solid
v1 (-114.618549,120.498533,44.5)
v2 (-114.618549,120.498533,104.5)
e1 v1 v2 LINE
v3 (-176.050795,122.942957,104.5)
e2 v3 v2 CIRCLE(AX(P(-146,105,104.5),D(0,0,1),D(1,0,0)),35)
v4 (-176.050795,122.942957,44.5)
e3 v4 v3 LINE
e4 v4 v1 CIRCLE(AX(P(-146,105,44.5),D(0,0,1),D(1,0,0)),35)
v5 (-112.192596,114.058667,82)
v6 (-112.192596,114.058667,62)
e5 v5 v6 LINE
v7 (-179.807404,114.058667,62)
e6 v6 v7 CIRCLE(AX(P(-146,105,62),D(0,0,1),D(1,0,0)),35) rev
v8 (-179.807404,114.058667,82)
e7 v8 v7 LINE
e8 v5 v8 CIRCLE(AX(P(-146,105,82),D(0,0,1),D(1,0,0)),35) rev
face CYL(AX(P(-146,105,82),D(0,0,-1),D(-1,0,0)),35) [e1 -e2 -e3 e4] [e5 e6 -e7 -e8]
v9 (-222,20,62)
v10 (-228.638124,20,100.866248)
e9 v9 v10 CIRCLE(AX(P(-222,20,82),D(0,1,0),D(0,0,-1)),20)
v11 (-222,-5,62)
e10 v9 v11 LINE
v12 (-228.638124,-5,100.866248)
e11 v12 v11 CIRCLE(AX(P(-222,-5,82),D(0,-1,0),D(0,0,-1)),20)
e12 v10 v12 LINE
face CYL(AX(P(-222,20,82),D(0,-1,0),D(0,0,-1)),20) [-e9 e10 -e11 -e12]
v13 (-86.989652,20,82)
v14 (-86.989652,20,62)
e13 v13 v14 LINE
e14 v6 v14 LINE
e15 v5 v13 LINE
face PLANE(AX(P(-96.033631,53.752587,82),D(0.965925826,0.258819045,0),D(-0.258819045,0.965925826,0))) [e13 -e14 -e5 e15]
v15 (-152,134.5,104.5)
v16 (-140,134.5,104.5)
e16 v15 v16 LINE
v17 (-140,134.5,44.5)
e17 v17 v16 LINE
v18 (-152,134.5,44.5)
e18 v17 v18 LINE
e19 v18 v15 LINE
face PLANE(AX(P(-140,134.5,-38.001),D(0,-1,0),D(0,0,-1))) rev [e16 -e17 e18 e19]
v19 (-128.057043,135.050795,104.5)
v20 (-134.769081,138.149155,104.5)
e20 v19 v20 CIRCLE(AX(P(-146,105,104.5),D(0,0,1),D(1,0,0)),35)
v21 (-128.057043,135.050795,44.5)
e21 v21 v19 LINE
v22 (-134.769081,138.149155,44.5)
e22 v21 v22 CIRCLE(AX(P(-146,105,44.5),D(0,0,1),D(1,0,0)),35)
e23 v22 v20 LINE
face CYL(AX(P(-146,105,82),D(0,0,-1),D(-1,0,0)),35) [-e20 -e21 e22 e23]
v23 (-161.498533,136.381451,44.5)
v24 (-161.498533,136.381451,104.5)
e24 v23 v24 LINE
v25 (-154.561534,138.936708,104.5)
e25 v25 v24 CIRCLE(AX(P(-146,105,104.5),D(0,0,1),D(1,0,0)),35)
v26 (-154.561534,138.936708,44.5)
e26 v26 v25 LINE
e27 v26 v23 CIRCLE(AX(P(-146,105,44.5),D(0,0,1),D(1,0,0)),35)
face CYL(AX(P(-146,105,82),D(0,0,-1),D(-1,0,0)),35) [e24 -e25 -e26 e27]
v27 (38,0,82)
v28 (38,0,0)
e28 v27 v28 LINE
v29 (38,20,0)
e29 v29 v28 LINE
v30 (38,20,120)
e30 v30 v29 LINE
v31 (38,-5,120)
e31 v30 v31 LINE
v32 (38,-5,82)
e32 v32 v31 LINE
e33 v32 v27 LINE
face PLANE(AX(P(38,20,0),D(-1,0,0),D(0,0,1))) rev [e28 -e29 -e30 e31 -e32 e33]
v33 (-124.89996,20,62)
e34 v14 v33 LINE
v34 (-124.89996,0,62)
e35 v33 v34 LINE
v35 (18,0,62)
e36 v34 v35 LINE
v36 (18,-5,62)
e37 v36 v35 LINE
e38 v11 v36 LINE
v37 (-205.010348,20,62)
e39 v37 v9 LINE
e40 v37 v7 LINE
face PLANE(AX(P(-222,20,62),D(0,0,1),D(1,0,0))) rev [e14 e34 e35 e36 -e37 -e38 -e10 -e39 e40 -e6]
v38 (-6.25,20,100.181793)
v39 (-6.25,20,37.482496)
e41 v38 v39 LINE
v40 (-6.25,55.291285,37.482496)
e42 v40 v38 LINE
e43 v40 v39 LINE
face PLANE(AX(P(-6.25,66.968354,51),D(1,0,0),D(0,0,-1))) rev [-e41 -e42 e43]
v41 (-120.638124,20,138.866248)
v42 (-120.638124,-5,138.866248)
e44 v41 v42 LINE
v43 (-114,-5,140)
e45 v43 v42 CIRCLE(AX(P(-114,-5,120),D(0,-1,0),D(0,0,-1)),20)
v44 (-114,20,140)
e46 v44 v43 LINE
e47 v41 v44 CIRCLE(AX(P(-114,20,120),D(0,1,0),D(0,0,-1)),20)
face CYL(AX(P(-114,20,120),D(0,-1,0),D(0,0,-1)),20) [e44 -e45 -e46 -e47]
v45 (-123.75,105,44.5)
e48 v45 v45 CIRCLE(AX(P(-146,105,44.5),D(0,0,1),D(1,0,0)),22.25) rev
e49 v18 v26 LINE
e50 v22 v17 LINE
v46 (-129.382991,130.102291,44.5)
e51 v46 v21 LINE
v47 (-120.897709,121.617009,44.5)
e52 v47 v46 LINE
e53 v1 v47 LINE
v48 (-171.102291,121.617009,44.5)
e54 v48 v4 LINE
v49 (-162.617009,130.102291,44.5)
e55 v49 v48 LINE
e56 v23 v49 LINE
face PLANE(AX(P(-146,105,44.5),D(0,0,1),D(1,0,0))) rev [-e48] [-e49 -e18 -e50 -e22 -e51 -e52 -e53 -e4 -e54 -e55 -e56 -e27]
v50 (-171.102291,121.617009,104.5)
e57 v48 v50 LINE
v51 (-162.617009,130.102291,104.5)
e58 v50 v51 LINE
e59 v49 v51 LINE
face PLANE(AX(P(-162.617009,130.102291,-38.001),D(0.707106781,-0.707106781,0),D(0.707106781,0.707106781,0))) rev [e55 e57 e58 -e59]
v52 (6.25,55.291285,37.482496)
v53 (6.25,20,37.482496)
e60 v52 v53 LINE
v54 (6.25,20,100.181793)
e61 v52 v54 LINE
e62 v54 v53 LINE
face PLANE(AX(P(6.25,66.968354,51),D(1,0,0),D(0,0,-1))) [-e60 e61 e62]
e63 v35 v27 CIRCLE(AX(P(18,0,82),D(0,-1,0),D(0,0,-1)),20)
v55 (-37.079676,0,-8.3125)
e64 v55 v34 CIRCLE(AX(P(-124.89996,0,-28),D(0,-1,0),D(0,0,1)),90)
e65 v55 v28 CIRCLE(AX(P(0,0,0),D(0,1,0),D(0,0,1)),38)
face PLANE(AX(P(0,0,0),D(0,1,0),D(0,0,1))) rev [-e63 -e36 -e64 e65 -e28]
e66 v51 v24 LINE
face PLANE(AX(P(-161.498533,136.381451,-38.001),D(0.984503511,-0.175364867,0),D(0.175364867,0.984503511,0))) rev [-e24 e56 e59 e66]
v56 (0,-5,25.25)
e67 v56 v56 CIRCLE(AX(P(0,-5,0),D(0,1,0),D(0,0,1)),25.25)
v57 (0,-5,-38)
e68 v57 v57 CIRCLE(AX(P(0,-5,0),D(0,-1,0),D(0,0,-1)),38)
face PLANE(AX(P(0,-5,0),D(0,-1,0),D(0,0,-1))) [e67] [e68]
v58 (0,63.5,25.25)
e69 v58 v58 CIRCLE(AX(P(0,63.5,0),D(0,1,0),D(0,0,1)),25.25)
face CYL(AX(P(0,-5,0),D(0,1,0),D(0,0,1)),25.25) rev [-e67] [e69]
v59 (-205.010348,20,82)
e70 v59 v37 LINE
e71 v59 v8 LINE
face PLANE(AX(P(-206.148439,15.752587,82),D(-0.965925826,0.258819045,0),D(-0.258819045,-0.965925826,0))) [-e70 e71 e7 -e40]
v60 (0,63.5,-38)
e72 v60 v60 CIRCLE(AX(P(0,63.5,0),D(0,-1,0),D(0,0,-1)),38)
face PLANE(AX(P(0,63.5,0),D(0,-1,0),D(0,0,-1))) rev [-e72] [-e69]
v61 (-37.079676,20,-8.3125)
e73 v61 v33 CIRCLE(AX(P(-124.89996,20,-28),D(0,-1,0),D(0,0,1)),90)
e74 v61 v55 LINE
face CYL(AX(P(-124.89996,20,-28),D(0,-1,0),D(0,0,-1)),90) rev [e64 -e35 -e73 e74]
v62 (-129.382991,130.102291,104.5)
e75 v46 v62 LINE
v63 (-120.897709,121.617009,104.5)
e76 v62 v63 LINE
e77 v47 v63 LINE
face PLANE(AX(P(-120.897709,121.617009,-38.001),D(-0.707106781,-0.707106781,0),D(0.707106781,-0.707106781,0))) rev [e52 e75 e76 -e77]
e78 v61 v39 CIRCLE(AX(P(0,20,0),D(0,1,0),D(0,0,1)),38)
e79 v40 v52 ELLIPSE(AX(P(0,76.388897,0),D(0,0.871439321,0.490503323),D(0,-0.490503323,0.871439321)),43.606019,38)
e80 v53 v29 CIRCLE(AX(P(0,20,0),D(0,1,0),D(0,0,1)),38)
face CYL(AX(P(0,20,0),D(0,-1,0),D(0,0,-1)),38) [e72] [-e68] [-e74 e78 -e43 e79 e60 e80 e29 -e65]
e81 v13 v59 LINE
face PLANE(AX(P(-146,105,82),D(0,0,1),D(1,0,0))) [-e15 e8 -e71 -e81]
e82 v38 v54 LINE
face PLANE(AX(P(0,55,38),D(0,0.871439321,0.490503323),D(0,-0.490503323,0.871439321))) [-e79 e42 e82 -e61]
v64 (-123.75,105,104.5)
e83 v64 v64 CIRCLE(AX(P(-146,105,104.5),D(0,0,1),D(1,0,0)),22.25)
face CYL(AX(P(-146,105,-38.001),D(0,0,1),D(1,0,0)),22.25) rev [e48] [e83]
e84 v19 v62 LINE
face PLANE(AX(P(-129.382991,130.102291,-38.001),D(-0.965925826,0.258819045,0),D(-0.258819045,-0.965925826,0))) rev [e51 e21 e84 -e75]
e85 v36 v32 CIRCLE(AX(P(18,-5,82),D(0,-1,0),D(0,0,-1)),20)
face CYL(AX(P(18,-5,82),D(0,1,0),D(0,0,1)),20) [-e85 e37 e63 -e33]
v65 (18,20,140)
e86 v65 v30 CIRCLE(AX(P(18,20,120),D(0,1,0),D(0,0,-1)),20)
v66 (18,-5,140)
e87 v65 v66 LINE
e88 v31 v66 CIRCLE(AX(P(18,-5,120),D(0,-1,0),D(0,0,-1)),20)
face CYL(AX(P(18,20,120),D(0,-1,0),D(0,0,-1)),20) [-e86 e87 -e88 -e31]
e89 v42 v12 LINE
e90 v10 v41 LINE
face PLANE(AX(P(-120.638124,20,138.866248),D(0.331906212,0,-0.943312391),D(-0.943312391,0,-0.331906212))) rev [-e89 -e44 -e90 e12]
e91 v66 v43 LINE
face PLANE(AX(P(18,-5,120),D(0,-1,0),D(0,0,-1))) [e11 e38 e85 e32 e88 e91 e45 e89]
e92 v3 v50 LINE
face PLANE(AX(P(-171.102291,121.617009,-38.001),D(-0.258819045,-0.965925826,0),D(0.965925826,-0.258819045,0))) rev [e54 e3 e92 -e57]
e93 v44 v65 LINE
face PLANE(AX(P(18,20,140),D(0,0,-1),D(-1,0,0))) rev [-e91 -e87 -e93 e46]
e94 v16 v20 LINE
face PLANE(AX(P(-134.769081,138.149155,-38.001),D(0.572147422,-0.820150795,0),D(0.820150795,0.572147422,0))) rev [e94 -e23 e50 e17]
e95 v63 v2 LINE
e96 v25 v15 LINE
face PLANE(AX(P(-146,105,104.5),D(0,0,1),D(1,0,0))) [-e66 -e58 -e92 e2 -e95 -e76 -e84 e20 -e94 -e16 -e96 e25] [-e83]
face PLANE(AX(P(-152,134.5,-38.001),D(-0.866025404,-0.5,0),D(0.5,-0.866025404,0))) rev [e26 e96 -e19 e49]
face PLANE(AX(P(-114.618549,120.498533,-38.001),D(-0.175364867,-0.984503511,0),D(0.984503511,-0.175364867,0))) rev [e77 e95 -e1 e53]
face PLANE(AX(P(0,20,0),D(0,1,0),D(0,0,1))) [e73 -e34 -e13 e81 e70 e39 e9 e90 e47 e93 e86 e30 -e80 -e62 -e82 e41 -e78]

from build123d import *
from build123d.topology import SkipClean

# Parameters (mm, degrees)
BOSS_EXTRUDE1_DEPTH             = 20
BOSS_EXTRUDE3_START             = 5
BOSS_EXTRUDE3_DEPTH             = 5
SKETCH3_R                       = 38
BOSS_EXTRUDE4_DEPTH             = 68.5
SKETCH4_R                       = 25.25
CUT_EXTRUDE1_DEPTH              = 288.847616
BOSS_EXTRUDE5_START             = 62
BOSS_EXTRUDE5_DEPTH             = 20
BOSS_EXTRUDE6_START             = 44.5
SKETCH6_R                       = 35
BOSS_EXTRUDE6_DEPTH             = 60
CUT_EXTRUDE2_REACH              = 315.8
SKETCH7_R                       = 22.25
CUT_EXTRUDE3_REACH              = 315.8
CIRPATTERN1_COUNT               = 2
CIRPATTERN1_ANGLE               = 45
CIRPATTERN1_THE_OTHER_WAY_COUNT = 2
CIRPATTERN1_THE_OTHER_WAY_ANGLE = 45
RIB1_REACH                      = 314.198
SKETCH9_WALL_W                  = 697.750692
SKETCH9_WALL_H                  = 12.5


with BuildPart() as part:
    # Sketch1 → Boss-Extrude1 (new body)
    with BuildSketch(Plane(origin=(0, 0, 0), x_dir=(1, 0, 0), z_dir=(0, 1, 0))):
        with BuildLine():
            Line((38, 0), (38, -120))
            ThreePointArc((38, -120), (32.142136, -134.142136), (18, -140))
            Line((18, -140), (-114, -140))
            ThreePointArc((-114, -140), (-117.367124, -139.714525), (-120.638124, -138.866248))
            Line((-120.638124, -138.866248), (-228.638124, -100.866248))
            ThreePointArc((-228.638124, -100.866248), (-241.714525, -78.632876), (-222, -62))
            Line((-222, -62), (-124.89996, -62))
            ThreePointArc((-124.89996, -62), (-68.64996, -42.256227), (-37.079676, 8.3125))
            ThreePointArc((-37.079676, 8.3125), (4.181646, 37.769218), (38, 0))
        make_face()
    extrude(amount=BOSS_EXTRUDE1_DEPTH)

    # Sketch2 → Boss-Extrude3 (add)
    with BuildSketch(Plane.XZ.offset(BOSS_EXTRUDE3_START)):
        with BuildLine():
            Line((38, 82), (38, 120))
            ThreePointArc((38, 120), (32.142136, 134.142136), (18, 140))
            Line((18, 140), (-114, 140))
            ThreePointArc((-114, 140), (-117.367124, 139.714525), (-120.638124, 138.866248))
            Line((-120.638124, 138.866248), (-228.638124, 100.866248))
            ThreePointArc((-228.638124, 100.866248), (-241.714525, 78.632876), (-222, 62))
            Line((-222, 62), (18, 62))
            ThreePointArc((18, 62), (32.142136, 67.857864), (38, 82))
        make_face()
    extrude(amount=-BOSS_EXTRUDE3_DEPTH)

    # Sketch3 → Boss-Extrude4 (add)
    with BuildSketch(Plane.XZ.offset(5)):
        with Locations(Location((0, 0, 0), (0, 0, 270))):
            Circle(SKETCH3_R)
    extrude(amount=-BOSS_EXTRUDE4_DEPTH)

    # Sketch4 → Cut-Extrude1 (cut, through all)
    with BuildSketch(Plane(origin=(0, 63.5, 0), x_dir=(1, 0, 0), z_dir=(0, 1, 0))):
        with Locations(Location((0, 0, 0), (0, 0, 270))):
            Circle(SKETCH4_R)
    extrude(amount=-CUT_EXTRUDE1_DEPTH, mode=Mode.SUBTRACT)

    # Sketch5 → Boss-Extrude5 (add)
    with BuildSketch(Plane.XY.offset(BOSS_EXTRUDE5_START)):
        with BuildLine():
            Line((-205.010348, 20), (-179.807404, 114.058667))
            ThreePointArc((-179.807404, 114.058667), (-146, 140), (-112.192596, 114.058667))
            Line((-112.192596, 114.058667), (-86.989652, 20))
            Line((-86.989652, 20), (-205.010348, 20))
        make_face()
    extrude(amount=BOSS_EXTRUDE5_DEPTH)

    # Sketch6 → Boss-Extrude6 (add)
    with SkipClean():  # the faces are left unmerged after this step: merging them gives an invalid solid
        with BuildSketch(Plane.XY.offset(BOSS_EXTRUDE6_START)):
            with Locations((-146, 105)):
                Circle(SKETCH6_R)
        extrude(amount=BOSS_EXTRUDE6_DEPTH)

    # Sketch7 → Cut-Extrude2 (cut, up to next)
    with BuildSketch(Plane.XY.offset(104.5), mode=Mode.PRIVATE) as cut_extrude2_sk1:
        with Locations((-146, 105)):
            Circle(SKETCH7_R)
    cut_extrude2_tool1 = extrude(cut_extrude2_sk1.sketch, amount=-CUT_EXTRUDE2_REACH, mode=Mode.PRIVATE) & part.part
    cut_extrude2 = cut_extrude2_tool1.solids().sort_by_distance((-146, 105, 104.5))[0]
    add(cut_extrude2, mode=Mode.SUBTRACT)

    # Sketch8 → Cut-Extrude3 (cut, up to next)
    with BuildSketch(Plane.XY.offset(104.5), mode=Mode.PRIVATE) as cut_extrude3_sk1:
        with BuildLine():
            Line((-134.769081, 138.149155), (-140, 134.5))
            Line((-140, 134.5), (-152, 134.5))
            Line((-152, 134.5), (-154.561534, 138.936708))
            ThreePointArc((-154.561534, 138.936708), (-144.608431, 139.972325), (-134.769081, 138.149155))
        make_face()
    cut_extrude3_tool1 = extrude(cut_extrude3_sk1.sketch, amount=-CUT_EXTRUDE3_REACH, mode=Mode.PRIVATE) & part.part
    cut_extrude3 = cut_extrude3_tool1.solids().sort_by_distance((-145.282593, 137.243619, 104.5))[0]
    add(cut_extrude3, mode=Mode.SUBTRACT)

    # CirPattern1: Cut-Extrude2, Cut-Extrude3 ×2 about axis
    with SkipClean():  # the faces are left unmerged after this step: merging them gives an invalid solid
        cirpattern1_axis = Axis((-146, 105, 0), (0, 0, 1))
        add([cut_extrude2.rotate(cirpattern1_axis, i * CIRPATTERN1_ANGLE / (CIRPATTERN1_COUNT - 1)) for i in range(1, CIRPATTERN1_COUNT)], mode=Mode.SUBTRACT)
        add([cut_extrude3.rotate(cirpattern1_axis, i * CIRPATTERN1_ANGLE / (CIRPATTERN1_COUNT - 1)) for i in range(1, CIRPATTERN1_COUNT)], mode=Mode.SUBTRACT)

    # CirPattern1 the other way: Cut-Extrude2, Cut-Extrude3 ×2 about axis
    with SkipClean():  # the faces are left unmerged after this step: merging them gives an invalid solid
        cirpattern1_the_other_way_axis = Axis((-146, 105, 0), (0, 0, -1))
        add([cut_extrude2.rotate(cirpattern1_the_other_way_axis, i * CIRPATTERN1_THE_OTHER_WAY_ANGLE / (CIRPATTERN1_THE_OTHER_WAY_COUNT - 1)) for i in range(1, CIRPATTERN1_THE_OTHER_WAY_COUNT)], mode=Mode.SUBTRACT)
        add([cut_extrude3.rotate(cirpattern1_the_other_way_axis, i * CIRPATTERN1_THE_OTHER_WAY_ANGLE / (CIRPATTERN1_THE_OTHER_WAY_COUNT - 1)) for i in range(1, CIRPATTERN1_THE_OTHER_WAY_COUNT)], mode=Mode.SUBTRACT)

    # Sketch9 wall → Rib1 (add, up to next)
    with BuildSketch(Plane(origin=(0, 37.5, 69.090897), x_dir=(0, -0.490503322765, 0.871439321099), z_dir=(0, -0.871439321099, -0.490503322765)), mode=Mode.PRIVATE) as rib1_sk1:
        Rectangle(SKETCH9_WALL_W, SKETCH9_WALL_H)
    rib1_tool1 = extrude(rib1_sk1.sketch, amount=RIB1_REACH, mode=Mode.PRIVATE) - part.part
    add(rib1_tool1.solids().sort_by_distance((0, 37.5, 69.090897))[0])


solid = part.part
